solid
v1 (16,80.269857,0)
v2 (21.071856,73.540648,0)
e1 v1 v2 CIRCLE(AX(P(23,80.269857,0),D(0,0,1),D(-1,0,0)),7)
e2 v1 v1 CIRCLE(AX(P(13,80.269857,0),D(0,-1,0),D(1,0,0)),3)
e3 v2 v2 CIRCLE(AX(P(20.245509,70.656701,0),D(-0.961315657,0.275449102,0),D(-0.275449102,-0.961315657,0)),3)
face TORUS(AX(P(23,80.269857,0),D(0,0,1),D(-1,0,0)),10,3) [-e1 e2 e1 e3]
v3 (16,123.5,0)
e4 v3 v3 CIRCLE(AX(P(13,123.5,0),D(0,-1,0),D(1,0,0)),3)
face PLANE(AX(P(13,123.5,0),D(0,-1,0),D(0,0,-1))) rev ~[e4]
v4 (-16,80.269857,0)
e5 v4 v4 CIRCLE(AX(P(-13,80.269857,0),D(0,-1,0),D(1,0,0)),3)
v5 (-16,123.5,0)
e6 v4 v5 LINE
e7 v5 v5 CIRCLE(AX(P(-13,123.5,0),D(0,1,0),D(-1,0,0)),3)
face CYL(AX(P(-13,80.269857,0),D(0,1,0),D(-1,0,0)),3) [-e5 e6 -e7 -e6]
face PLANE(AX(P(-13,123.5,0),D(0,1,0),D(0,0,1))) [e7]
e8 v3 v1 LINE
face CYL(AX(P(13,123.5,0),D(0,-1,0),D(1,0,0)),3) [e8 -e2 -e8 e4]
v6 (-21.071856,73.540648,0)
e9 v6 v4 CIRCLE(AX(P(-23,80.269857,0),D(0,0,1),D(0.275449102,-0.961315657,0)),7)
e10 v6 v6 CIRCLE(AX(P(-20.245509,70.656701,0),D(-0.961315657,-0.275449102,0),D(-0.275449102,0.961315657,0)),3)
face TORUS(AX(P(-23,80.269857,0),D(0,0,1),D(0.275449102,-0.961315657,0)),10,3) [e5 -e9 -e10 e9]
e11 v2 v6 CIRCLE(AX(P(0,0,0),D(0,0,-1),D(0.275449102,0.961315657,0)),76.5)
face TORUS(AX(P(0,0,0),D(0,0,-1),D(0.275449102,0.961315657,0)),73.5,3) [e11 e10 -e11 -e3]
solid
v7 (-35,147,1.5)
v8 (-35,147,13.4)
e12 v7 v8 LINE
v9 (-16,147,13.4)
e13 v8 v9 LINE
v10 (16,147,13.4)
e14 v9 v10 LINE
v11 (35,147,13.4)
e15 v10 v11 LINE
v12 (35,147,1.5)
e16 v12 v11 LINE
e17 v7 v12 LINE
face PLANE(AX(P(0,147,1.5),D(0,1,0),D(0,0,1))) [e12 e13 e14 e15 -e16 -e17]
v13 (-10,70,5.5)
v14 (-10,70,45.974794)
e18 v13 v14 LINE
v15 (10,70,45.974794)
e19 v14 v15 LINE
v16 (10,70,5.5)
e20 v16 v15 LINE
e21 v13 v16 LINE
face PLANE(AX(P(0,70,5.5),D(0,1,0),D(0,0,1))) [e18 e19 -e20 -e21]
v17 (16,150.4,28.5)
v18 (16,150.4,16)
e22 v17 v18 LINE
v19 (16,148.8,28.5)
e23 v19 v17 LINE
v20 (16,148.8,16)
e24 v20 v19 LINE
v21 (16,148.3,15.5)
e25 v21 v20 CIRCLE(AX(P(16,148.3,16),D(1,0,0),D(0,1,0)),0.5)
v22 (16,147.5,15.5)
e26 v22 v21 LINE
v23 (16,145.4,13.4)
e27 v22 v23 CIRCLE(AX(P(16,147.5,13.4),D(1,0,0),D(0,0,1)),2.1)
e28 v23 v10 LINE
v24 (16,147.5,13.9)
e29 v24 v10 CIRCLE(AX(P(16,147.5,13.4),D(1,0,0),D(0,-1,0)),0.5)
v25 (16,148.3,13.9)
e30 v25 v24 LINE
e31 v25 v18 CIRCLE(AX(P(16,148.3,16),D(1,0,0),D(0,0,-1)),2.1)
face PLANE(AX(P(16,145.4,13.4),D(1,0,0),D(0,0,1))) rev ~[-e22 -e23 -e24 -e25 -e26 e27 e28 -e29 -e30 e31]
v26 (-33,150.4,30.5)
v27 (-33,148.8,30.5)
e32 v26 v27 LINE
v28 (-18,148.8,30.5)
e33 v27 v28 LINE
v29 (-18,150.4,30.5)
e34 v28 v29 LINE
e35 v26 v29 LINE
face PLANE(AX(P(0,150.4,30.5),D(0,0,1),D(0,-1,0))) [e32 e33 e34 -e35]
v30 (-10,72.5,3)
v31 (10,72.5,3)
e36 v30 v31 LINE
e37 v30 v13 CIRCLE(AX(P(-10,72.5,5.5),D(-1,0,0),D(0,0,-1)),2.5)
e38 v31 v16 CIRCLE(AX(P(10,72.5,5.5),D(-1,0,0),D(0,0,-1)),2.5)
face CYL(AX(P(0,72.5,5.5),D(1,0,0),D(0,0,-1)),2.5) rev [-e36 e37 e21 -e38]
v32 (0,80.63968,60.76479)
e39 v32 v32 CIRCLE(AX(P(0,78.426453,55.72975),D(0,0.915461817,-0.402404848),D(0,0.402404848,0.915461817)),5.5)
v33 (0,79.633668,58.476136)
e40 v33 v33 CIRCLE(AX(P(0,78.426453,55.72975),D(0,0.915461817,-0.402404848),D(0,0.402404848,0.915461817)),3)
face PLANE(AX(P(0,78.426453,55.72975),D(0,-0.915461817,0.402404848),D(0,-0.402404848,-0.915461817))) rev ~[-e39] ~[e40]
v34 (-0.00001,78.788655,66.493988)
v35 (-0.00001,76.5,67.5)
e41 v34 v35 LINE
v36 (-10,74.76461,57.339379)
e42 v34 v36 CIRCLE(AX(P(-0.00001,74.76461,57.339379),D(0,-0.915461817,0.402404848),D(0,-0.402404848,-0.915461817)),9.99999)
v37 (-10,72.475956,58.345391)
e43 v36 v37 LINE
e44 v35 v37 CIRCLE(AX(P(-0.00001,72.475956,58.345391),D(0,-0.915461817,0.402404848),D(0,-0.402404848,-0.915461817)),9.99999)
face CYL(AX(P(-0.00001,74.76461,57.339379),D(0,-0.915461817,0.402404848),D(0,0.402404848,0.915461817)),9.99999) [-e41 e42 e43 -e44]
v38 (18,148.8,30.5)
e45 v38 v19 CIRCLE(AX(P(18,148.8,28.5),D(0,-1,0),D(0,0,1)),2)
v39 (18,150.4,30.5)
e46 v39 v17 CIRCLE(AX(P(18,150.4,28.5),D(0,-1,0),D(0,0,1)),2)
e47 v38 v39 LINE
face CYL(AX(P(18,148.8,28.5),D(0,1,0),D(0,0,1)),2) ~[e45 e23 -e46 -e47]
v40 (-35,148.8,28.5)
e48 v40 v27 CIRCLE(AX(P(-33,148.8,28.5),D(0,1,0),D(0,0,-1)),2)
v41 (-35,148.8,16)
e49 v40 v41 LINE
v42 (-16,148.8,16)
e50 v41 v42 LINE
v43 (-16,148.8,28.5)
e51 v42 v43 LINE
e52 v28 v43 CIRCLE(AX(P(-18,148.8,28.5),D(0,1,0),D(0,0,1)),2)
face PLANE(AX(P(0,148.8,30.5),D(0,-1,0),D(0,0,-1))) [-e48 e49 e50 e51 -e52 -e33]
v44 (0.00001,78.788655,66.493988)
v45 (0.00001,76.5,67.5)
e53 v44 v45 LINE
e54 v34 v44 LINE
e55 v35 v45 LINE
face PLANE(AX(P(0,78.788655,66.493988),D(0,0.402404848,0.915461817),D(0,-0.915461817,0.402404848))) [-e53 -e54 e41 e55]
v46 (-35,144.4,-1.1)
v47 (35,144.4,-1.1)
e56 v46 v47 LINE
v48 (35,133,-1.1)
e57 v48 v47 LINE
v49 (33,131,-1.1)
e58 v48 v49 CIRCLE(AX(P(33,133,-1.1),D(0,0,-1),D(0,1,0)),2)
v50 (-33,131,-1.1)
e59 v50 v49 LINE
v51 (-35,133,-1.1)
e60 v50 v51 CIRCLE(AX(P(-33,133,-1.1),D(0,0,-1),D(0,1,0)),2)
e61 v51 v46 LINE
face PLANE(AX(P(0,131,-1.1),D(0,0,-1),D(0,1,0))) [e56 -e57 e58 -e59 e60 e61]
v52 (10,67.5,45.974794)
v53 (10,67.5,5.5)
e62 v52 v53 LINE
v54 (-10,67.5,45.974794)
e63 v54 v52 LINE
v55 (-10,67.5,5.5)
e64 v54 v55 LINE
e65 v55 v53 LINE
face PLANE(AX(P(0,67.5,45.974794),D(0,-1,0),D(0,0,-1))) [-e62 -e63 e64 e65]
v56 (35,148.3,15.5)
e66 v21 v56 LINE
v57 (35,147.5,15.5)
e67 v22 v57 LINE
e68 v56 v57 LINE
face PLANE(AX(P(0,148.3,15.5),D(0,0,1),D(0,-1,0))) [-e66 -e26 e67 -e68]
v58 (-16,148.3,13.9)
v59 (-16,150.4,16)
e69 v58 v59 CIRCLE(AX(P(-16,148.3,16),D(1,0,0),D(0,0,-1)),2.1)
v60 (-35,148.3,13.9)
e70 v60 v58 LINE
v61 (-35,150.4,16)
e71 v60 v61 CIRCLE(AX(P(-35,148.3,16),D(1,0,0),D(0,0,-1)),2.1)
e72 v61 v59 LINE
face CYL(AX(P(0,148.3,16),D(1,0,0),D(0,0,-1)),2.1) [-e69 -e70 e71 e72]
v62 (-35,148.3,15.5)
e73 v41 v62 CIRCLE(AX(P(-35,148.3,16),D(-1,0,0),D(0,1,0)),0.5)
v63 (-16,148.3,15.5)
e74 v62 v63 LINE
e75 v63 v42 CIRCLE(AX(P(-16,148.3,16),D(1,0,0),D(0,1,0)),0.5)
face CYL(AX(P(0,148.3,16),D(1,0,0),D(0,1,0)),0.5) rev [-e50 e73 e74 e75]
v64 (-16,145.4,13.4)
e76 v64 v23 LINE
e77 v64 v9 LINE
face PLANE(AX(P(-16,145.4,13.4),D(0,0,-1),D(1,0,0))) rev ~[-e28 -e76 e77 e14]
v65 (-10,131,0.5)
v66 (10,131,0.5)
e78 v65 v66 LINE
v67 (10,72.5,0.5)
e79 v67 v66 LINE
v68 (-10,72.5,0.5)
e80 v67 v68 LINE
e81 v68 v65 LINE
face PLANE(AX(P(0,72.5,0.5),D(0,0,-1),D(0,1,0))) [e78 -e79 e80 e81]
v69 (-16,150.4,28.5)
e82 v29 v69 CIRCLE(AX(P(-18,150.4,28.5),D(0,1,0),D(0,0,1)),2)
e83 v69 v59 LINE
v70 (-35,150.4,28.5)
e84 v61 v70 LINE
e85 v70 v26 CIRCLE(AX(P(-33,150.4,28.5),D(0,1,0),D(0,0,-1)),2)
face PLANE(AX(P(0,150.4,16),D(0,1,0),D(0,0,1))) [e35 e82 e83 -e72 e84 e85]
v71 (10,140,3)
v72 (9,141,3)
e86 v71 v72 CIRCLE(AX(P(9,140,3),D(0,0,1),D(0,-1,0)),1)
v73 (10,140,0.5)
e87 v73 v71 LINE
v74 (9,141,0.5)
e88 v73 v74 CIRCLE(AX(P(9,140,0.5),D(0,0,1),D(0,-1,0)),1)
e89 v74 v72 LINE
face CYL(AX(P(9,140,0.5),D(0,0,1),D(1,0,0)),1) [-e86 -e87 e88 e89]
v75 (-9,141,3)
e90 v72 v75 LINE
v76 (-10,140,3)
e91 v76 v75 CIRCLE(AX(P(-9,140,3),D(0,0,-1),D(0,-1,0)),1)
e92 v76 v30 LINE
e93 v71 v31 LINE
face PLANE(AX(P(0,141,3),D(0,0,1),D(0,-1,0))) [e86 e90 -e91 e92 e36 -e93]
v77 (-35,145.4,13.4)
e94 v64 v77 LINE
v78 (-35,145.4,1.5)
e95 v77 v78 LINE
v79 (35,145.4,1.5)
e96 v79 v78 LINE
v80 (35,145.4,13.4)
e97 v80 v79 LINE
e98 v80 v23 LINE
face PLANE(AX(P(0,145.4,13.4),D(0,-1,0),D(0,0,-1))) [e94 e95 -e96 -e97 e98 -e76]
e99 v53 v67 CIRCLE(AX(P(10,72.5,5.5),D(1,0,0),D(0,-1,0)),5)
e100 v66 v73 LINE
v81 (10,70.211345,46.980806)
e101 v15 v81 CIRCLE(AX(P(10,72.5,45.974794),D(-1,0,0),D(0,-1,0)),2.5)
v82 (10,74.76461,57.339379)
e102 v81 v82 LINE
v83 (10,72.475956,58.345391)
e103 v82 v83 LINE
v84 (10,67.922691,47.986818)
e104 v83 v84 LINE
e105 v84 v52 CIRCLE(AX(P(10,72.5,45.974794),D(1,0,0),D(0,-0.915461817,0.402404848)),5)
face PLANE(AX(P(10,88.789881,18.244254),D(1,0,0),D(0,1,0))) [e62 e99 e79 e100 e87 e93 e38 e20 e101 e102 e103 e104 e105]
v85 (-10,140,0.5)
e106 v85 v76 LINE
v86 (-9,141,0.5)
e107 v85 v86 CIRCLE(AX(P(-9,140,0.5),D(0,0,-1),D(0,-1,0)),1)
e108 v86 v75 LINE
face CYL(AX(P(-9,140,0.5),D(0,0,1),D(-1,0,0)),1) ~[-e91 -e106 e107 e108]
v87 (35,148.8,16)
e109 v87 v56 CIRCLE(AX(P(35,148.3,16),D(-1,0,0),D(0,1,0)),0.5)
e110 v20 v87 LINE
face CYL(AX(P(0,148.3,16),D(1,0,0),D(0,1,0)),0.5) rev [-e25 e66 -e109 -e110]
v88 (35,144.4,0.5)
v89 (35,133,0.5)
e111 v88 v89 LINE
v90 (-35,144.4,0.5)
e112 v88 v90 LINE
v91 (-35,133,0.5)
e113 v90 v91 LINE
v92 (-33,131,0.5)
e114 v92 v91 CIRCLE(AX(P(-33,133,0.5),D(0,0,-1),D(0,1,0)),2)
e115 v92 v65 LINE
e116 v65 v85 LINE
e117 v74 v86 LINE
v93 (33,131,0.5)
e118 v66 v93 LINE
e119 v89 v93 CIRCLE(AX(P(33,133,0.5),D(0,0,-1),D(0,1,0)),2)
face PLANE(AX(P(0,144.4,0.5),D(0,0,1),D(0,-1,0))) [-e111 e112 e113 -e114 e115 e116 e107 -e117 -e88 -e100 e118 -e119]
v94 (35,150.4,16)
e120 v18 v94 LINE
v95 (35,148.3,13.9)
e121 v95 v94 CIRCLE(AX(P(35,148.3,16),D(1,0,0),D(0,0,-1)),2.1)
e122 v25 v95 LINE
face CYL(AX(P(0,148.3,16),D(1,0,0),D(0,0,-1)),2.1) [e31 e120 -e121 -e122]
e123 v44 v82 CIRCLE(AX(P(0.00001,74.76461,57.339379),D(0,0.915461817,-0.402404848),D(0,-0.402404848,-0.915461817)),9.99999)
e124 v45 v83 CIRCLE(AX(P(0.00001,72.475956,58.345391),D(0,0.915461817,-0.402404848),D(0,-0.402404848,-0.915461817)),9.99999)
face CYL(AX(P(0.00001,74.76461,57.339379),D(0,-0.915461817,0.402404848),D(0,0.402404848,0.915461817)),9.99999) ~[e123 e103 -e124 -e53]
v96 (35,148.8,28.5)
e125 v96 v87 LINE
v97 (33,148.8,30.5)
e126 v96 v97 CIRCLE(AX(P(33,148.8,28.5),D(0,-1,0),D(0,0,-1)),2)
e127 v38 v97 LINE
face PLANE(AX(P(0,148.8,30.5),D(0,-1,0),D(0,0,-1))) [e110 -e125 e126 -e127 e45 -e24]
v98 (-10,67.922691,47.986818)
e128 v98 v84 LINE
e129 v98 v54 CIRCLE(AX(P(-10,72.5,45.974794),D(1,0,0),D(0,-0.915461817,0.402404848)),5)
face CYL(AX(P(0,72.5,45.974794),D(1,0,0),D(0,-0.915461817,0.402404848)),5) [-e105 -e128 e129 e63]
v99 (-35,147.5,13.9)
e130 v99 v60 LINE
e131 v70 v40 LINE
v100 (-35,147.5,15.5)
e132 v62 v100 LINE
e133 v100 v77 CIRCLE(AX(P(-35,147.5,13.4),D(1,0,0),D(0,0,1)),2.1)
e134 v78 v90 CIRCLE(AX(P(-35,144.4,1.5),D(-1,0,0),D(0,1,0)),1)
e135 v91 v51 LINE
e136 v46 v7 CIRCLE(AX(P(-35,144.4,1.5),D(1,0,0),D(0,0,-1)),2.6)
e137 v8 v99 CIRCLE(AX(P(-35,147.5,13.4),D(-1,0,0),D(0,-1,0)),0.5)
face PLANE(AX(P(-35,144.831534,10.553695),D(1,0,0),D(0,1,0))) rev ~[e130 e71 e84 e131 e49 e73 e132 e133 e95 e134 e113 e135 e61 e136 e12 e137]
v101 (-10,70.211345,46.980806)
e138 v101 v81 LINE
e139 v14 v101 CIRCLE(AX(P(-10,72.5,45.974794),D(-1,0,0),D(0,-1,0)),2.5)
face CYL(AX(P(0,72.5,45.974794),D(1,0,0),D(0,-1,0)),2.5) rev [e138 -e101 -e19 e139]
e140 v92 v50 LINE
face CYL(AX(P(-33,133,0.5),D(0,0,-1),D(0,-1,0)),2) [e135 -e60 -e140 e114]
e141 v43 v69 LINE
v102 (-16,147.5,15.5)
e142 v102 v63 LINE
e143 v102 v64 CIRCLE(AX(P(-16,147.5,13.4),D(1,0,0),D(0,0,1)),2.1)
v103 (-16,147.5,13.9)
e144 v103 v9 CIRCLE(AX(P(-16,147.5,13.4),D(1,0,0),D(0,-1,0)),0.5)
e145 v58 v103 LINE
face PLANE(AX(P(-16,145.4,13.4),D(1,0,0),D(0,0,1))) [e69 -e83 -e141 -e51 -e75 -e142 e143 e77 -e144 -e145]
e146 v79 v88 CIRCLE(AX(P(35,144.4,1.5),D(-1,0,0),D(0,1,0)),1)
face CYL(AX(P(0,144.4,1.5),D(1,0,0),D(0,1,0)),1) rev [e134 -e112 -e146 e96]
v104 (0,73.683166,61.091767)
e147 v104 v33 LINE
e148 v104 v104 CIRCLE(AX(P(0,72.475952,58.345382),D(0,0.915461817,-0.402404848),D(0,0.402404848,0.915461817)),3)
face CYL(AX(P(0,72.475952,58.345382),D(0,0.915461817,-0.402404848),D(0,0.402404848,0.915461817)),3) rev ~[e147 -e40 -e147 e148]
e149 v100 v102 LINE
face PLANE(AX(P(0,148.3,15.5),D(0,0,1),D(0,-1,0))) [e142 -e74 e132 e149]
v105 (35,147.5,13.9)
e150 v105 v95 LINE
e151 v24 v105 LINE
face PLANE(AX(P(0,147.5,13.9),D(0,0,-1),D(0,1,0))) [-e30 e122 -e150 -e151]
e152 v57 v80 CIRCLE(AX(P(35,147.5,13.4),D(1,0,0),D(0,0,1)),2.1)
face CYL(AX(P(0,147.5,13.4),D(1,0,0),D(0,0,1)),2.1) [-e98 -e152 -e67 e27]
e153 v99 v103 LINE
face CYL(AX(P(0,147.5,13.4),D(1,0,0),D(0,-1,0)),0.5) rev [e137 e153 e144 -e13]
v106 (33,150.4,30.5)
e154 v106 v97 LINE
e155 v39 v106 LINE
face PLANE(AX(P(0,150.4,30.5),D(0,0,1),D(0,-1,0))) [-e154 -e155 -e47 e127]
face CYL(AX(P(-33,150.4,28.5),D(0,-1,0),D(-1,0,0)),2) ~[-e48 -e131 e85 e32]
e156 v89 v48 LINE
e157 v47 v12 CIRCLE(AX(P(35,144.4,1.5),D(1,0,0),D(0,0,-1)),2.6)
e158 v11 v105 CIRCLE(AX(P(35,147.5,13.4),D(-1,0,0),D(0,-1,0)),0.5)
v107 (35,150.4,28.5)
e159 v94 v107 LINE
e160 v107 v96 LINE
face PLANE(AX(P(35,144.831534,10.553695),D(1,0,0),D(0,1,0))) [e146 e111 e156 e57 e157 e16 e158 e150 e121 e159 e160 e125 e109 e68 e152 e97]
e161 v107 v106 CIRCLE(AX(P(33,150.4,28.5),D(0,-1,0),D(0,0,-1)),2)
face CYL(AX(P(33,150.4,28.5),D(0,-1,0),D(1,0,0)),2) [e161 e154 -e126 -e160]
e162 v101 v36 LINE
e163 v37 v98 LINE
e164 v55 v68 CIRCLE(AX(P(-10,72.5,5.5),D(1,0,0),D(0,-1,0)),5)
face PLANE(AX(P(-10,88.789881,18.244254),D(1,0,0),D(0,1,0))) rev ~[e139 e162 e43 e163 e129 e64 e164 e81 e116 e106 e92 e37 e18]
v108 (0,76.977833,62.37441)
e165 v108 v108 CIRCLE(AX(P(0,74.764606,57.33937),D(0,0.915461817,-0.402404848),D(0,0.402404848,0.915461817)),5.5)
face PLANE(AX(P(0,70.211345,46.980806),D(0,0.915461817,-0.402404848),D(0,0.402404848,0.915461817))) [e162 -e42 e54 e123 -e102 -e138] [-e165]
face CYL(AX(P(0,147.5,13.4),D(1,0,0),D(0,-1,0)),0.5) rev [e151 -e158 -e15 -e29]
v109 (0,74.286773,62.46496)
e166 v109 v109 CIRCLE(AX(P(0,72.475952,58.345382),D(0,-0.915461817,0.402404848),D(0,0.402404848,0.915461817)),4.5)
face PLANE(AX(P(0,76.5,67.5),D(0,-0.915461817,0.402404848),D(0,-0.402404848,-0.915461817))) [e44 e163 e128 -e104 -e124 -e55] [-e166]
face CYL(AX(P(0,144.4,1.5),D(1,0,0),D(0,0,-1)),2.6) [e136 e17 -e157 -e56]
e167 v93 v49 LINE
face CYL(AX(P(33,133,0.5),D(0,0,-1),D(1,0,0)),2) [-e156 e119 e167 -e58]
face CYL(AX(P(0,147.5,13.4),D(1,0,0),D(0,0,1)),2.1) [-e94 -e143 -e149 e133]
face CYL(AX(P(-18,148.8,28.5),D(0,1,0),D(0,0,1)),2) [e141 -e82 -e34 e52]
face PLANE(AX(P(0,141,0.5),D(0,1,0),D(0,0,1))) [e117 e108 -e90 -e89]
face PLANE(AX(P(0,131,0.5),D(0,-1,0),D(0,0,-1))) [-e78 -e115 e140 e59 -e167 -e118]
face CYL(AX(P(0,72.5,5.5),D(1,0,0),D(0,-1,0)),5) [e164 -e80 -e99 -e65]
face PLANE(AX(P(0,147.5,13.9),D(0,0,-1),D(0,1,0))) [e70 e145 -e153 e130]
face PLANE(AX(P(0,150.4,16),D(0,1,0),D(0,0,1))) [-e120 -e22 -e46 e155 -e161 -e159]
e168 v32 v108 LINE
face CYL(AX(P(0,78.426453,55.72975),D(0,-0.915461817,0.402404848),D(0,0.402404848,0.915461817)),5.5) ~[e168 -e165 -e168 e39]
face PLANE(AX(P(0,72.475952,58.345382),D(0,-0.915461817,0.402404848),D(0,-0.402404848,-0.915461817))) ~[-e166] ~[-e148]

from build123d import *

# Parameters (mm, degrees)
F2_R      = 3
F5_DEPTH  = 10
F6_R      = 9.99999
F7_R      = 4.5
F8_DEPTH  = 87.4178290219
F9_R      = 1
F11_DEPTH = 35
F12_W     = 32
F12_H     = 17.1
F13_DEPTH = 25
F14_R     = 2


# Not quite as in the source:
# - a fillet or chamfer is up to 0.001 mm smaller than in the source, because OpenCascade refuses the exact size


with BuildPart() as f3:
    # F3: sweep along a path in F0
    with BuildLine(Plane.XY) as f3_path:
        Line((13, 123.5), (13, 80.2698573563))
        ThreePointArc((13, 80.2698573563), (15.0142342202, 74.2509251495), (20.245508982, 70.6567007867))
        ThreePointArc((20.245508982, 70.6567007867), (0, -73.5), (-20.245508982, 70.6567007867))
        ThreePointArc((-20.245508982, 70.6567007867), (-15.0142342202, 74.2509251495), (-13, 80.2698573563))
        Line((-13, 80.2698573563), (-13, 123.5))
    # F2 (on plane+point) → F3 (sweep)
    with BuildSketch(Plane.XZ.offset(-123.5)):
        with Locations((13, 0)):
            Circle(F2_R)
    sweep(path=f3_path.line)


with BuildPart() as f5:
    # F4 (on Right) → F5 (new body, symmetric)
    with BuildSketch(Plane.YZ):
        with BuildLine():
            Line((141, 3), (72.5, 3))
            ThreePointArc((72.5, 3), (70.732233047, 3.732233047), (70, 5.5))
            Line((70, 5.5), (70, 45.9747939576))
            ThreePointArc((70, 45.9747939576), (70.0534068222, 46.4887801657), (70.2113454577, 46.9808060778))
            Line((70.2113454577, 46.9808060778), (78.7886545423, 66.4939878798))
            Line((78.7886545423, 66.4939878798), (76.5, 67.5))
            Line((76.5, 67.5), (67.9226909154, 47.9868181981))
            ThreePointArc((67.9226909154, 47.9868181981), (67.6068136443, 47.0027663738), (67.5, 45.9747939576))
            Line((67.5, 45.9747939576), (67.5, 5.5))
            ThreePointArc((67.5, 5.5), (68.9644660941, 1.9644660941), (72.5, 0.5))
            Line((72.5, 0.5), (141, 0.5))
            Line((141, 0.5), (141, 3))
        make_face()
    extrude(amount=F5_DEPTH, both=True)

    # F6 (radius 10 in the source; OpenCascade refuses exactly that, so slightly less here)
    f6_edges = [f5.edges().sort_by_distance(p)[0] for p in [
        (10, 77.644327, 66.996994),
        (-10, 77.644327, 66.996994),
    ]]
    fillet(f6_edges, radius=F6_R)

    # F7 (on face) → F8 (cut, through all)
    with BuildSketch(Plane(origin=(0, 39.2463074221, -17.2512977435), x_dir=(1, 0, 0), z_dir=(0, -0.9154618169, 0.4024048481))):
        with Locations((0, 82.577643521)):
            Circle(F7_R)
    extrude(amount=-F8_DEPTH, mode=Mode.SUBTRACT)

    # F9
    f9_edges = [f5.edges().sort_by_distance(p)[0] for p in [
        (-10, 141, 1.75),
        (10, 141, 1.75),
    ]]
    fillet(f9_edges, radius=F9_R)

    # F10 (on Right) → F11 (join, symmetric)
    with BuildSketch(Plane.YZ):
        with BuildLine():
            Line((144.4, 0.5), (131, 0.5))
            Line((131, 0.5), (131, -1.1))
            Line((131, -1.1), (144.4, -1.1))
            ThreePointArc((144.4, -1.1), (146.2384776311, -0.3384776311), (147, 1.5))
            Line((147, 1.5), (147, 13.4))
            ThreePointArc((147, 13.4), (147.1464466094, 13.7535533906), (147.5, 13.9))
            Line((147.5, 13.9), (148.3, 13.9))
            ThreePointArc((148.3, 13.9), (149.7849242405, 14.5150757595), (150.4, 16))
            Line((150.4, 16), (150.4, 30.5))
            Line((150.4, 30.5), (148.8, 30.5))
            Line((148.8, 30.5), (148.8, 16))
            ThreePointArc((148.8, 16), (148.6535533906, 15.6464466094), (148.3, 15.5))
            Line((148.3, 15.5), (147.5, 15.5))
            ThreePointArc((147.5, 15.5), (146.0150757595, 14.8849242405), (145.4, 13.4))
            Line((145.4, 13.4), (145.4, 1.5))
            ThreePointArc((145.4, 1.5), (145.1071067812, 0.7928932188), (144.4, 0.5))
        make_face()
    extrude(amount=F11_DEPTH, both=True)

    # F12 (on face) → F13 (cut)
    with BuildSketch(Plane.XZ.offset(-145.4)):
        with Locations((0, 21.95)):
            Rectangle(F12_W, F12_H)
    extrude(amount=-F13_DEPTH, mode=Mode.SUBTRACT)

    # F14
    f14_edges = [f5.edges().sort_by_distance(p)[0] for p in [
        (-16, 149.6, 30.5),
        (-35, 149.6, 30.5),
        (16, 149.6, 30.5),
        (35, 149.6, 30.5),
        (-35, 131, -0.3),
        (35, 131, -0.3),
    ]]
    fillet(f14_edges, radius=F14_R)

    # F15 (on Right) → F16 (revolve)
    with BuildSketch(Plane.YZ):
        Polygon((76.5754278778, 61.4589478867), (74.2867733355, 62.464960007), (73.6831660633, 61.0917672816), (79.6336678733, 58.476135769), (80.6396799935, 60.7647903113), (76.9778327259, 62.3744097036), align=None)
    revolve(axis=Axis((0, 74.857979277, 57.2983261259), (0, 0.9154618169, -0.4024048481)))


solid = Compound([f3.part, f5.part])
